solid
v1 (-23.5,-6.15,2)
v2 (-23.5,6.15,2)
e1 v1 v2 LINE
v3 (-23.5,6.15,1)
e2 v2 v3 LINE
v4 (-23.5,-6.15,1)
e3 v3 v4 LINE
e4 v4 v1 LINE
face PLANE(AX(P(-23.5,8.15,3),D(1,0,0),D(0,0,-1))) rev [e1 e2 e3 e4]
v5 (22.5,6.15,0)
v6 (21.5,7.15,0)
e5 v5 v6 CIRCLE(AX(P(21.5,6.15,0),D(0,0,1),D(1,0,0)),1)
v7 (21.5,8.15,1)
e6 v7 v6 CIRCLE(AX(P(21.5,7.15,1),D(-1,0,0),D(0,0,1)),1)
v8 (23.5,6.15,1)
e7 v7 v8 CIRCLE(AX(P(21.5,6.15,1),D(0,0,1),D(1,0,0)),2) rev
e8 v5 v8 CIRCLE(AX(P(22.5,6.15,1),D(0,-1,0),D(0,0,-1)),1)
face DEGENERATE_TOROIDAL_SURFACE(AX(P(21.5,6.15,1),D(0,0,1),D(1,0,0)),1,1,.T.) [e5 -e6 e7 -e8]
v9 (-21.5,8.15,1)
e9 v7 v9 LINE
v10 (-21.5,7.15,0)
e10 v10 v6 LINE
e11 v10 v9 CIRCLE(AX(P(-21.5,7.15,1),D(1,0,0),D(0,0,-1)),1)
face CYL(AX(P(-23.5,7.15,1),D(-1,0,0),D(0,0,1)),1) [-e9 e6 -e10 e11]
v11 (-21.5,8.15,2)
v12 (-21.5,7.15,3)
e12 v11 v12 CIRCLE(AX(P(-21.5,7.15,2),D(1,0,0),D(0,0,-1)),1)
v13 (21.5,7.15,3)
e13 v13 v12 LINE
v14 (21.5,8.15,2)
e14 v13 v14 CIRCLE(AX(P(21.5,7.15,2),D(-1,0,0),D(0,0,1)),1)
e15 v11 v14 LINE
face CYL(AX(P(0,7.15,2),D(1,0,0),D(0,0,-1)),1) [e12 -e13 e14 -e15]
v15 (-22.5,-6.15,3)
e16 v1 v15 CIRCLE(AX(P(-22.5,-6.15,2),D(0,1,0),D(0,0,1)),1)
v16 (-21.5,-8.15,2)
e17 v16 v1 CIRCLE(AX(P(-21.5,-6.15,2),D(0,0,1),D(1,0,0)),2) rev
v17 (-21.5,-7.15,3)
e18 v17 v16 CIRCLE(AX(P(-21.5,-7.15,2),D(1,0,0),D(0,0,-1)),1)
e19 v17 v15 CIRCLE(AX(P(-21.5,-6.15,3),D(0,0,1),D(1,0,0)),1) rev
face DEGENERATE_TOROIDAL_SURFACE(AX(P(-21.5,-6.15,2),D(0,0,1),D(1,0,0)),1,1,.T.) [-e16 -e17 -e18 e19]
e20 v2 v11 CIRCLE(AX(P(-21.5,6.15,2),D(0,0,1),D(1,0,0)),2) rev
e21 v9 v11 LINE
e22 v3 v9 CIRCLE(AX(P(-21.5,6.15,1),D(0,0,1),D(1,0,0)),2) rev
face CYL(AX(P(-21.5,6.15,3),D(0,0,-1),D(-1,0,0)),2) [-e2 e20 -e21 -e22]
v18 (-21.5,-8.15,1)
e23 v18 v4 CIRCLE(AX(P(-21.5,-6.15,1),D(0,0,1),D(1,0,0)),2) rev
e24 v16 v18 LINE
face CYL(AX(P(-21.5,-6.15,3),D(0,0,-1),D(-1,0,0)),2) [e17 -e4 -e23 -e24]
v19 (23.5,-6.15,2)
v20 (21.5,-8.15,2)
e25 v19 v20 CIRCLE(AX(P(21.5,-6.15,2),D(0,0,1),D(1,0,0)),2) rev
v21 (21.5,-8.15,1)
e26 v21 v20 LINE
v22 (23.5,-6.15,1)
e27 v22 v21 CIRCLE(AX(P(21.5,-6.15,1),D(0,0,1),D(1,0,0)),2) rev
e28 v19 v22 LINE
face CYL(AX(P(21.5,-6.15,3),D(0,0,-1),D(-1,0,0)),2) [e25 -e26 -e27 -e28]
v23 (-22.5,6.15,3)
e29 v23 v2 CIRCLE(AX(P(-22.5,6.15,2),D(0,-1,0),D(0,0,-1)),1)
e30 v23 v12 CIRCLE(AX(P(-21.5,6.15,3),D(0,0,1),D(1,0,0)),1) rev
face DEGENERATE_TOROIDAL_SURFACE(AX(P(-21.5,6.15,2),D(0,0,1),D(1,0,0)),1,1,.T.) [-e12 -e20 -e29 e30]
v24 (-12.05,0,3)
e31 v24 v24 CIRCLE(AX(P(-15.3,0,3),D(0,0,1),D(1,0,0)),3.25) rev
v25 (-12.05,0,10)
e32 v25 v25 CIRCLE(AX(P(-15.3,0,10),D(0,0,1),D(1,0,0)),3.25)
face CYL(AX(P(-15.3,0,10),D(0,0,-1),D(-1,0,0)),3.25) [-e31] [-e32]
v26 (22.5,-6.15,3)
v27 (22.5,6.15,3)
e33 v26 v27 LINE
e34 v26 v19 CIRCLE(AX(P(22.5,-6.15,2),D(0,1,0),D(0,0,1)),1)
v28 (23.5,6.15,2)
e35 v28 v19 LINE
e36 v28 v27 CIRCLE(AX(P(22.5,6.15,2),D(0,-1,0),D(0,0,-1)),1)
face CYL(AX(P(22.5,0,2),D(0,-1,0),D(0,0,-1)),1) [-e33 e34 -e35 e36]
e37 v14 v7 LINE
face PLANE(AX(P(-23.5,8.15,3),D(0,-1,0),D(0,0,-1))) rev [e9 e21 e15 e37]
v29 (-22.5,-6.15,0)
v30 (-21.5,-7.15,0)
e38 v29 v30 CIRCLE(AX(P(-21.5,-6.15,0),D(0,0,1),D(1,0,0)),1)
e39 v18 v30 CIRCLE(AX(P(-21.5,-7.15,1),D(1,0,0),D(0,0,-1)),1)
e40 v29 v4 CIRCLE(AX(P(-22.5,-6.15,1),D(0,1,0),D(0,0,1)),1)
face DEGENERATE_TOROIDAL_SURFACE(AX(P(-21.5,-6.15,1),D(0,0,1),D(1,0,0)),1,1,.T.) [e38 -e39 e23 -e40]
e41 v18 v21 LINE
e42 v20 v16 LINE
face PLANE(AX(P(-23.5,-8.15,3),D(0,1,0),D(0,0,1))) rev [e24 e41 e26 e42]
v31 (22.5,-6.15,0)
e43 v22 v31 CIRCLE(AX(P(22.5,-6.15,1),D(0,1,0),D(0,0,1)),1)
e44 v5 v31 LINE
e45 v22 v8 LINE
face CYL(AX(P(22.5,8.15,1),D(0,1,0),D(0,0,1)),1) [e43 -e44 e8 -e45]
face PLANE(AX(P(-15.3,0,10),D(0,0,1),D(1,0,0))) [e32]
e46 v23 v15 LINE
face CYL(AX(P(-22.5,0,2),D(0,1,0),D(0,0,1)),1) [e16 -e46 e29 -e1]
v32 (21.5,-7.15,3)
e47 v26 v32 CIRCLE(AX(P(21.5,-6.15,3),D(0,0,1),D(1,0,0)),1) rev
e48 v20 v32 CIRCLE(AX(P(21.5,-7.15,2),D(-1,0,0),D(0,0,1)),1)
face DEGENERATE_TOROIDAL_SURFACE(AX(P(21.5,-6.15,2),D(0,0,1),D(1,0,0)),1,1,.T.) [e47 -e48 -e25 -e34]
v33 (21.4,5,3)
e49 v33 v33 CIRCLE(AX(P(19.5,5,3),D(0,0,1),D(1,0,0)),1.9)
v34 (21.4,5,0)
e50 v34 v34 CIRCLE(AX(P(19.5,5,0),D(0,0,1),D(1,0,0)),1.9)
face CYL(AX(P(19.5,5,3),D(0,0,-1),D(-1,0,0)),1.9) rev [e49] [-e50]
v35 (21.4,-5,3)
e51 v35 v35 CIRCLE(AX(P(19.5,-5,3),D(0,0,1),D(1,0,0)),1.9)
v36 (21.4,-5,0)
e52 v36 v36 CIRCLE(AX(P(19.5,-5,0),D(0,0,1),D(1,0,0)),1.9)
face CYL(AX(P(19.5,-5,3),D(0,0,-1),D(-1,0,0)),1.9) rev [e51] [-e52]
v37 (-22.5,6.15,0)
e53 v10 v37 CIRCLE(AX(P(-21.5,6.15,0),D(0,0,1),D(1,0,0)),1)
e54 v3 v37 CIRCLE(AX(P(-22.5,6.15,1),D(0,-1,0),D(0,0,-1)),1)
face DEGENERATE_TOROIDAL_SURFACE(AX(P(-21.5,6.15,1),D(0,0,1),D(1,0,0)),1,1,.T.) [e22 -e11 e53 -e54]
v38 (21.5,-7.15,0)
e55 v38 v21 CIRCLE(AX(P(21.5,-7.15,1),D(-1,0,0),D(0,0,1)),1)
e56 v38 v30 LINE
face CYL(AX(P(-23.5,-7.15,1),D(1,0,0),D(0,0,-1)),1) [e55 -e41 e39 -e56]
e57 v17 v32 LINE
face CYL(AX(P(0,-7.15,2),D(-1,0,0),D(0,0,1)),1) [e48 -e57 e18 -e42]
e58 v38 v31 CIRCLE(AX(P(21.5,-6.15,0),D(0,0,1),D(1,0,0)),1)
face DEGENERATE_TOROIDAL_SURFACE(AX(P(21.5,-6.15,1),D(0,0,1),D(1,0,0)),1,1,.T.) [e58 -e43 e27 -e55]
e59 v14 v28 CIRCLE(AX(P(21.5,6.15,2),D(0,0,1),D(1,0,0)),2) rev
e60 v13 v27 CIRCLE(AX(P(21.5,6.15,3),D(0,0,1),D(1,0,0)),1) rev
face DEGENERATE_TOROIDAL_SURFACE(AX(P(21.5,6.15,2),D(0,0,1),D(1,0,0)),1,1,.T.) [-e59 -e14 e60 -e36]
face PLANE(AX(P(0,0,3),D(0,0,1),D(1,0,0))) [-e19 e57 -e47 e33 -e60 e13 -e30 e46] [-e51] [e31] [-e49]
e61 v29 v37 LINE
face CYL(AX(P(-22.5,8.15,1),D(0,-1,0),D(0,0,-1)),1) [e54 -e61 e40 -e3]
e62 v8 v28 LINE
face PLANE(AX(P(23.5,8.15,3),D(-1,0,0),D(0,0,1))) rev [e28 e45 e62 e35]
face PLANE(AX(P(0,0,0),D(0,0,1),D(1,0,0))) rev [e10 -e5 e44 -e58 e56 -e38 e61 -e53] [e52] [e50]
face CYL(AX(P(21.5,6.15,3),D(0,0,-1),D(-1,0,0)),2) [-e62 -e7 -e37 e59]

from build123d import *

# Parameters (mm, degrees)
SKETCH1_W           = 47
SKETCH1_H           = 16.3
SKETCH1_R           = 1.9
BOSS_EXTRUDE1_DEPTH = 3
SKETCH2_R           = 3.25
BOSS_EXTRUDE2_DEPTH = 10
FILLET1_R           = 1
FILLET2_R           = 2


with BuildPart() as part:
    # Sketch1 → Boss-Extrude1 (new body)
    with BuildSketch(Plane.XY):
        Rectangle(SKETCH1_W, SKETCH1_H)
        with Locations((19.5, 5)):
            Circle(SKETCH1_R, mode=Mode.SUBTRACT)
        with Locations((19.5, -5)):
            Circle(SKETCH1_R, mode=Mode.SUBTRACT)
    extrude(amount=BOSS_EXTRUDE1_DEPTH)

    # Sketch2 → Boss-Extrude2 (add)
    with BuildSketch(Plane.XY):
        with Locations((-15.3, 0)):
            Circle(SKETCH2_R)
    extrude(amount=BOSS_EXTRUDE2_DEPTH)

    # Fillet1
    fillet1_edges = [part.edges().sort_by_distance(p)[0] for p in [
        (-23.5, 0, 3),
        (0, -8.15, 3),
        (23.5, 0, 3),
        (0, -8.15, 0),
        (-23.5, 0, 0),
        (0, 8.15, 0),
        (23.5, 0, 0),
        (0, 8.15, 3),
    ]]
    fillet(fillet1_edges, radius=FILLET1_R)

    # Fillet2
    # the kernel refuses this fillet: 2 mm, written as the material it takes off along each edge
    with BuildSketch(Plane(origin=(-21.5, -6.15, 0), x_dir=(0, -1, 0), z_dir=(1, 0, 0))) as fillet2_piece_1:
        with BuildLine():
            CenterArc((1, -1), 1, 0, 90)
            Line((2, -1), (2, 0))
            Line((2, 0), (1, 0))
        make_face()
    revolve(axis=Axis((-21.5, -6.15, 0), (0, 0, -1)), revolution_arc=90, mode=Mode.SUBTRACT)
    with BuildSketch(Plane(origin=(-21.5, 6.15, 0), x_dir=(-1, 0, 0), z_dir=(0, -1, 0))) as fillet2_piece_2:
        with BuildLine():
            CenterArc((1, -1), 1, 0, 90)
            Line((2, -1), (2, 0))
            Line((2, 0), (1, 0))
        make_face()
    revolve(axis=Axis((-21.5, 6.15, 0), (0, 0, -1)), revolution_arc=90, mode=Mode.SUBTRACT)
    with BuildSketch(Plane(origin=(21.5, -6.15, 0), x_dir=(1, 0, 0), z_dir=(0, 1, 0))) as fillet2_piece_3:
        with BuildLine():
            CenterArc((1, -1), 1, 0, 90)
            Line((2, -1), (2, 0))
            Line((2, 0), (1, 0))
        make_face()
    revolve(axis=Axis((21.5, -6.15, 0), (0, 0, -1)), revolution_arc=90, mode=Mode.SUBTRACT)
    with BuildSketch(Plane(origin=(21.5, 6.15, 0), x_dir=(0, 1, 0), z_dir=(-1, 0, 0))) as fillet2_piece_4:
        with BuildLine():
            CenterArc((1, -1), 1, 0, 90)
            Line((2, -1), (2, 0))
            Line((2, 0), (1, 0))
        make_face()
    revolve(axis=Axis((21.5, 6.15, 0), (0, 0, -1)), revolution_arc=90, mode=Mode.SUBTRACT)
    with BuildSketch(Plane(origin=(21.5, -6.15, 3), x_dir=(0, -1, 0), z_dir=(-1, 0, 0))) as fillet2_piece_5:
        with BuildLine():
            CenterArc((1, -1), 1, 0, 90)
            Line((2, -1), (2, 0))
            Line((2, 0), (1, 0))
        make_face()
    revolve(axis=Axis((21.5, -6.15, 3), (0, 0, 1)), revolution_arc=90, mode=Mode.SUBTRACT)
    with BuildSketch(Plane(origin=(-21.5, -6.15, 3), x_dir=(-1, 0, 0), z_dir=(0, 1, 0))) as fillet2_piece_6:
        with BuildLine():
            CenterArc((1, -1), 1, 0, 90)
            Line((2, -1), (2, 0))
            Line((2, 0), (1, 0))
        make_face()
    revolve(axis=Axis((-21.5, -6.15, 3), (0, 0, 1)), revolution_arc=90, mode=Mode.SUBTRACT)
    with BuildSketch(Plane(origin=(21.5, 6.15, 3), x_dir=(1, 0, 0), z_dir=(0, -1, 0))) as fillet2_piece_7:
        with BuildLine():
            CenterArc((1, -1), 1, 0, 90)
            Line((2, -1), (2, 0))
            Line((2, 0), (1, 0))
        make_face()
    revolve(axis=Axis((21.5, 6.15, 3), (0, 0, 1)), revolution_arc=90, mode=Mode.SUBTRACT)
    with BuildSketch(Plane(origin=(-21.5, 6.15, 3), x_dir=(0, 1, 0), z_dir=(1, 0, 0))) as fillet2_piece_8:
        with BuildLine():
            CenterArc((1, -1), 1, 0, 90)
            Line((2, -1), (2, 0))
            Line((2, 0), (1, 0))
        make_face()
    revolve(axis=Axis((-21.5, 6.15, 3), (0, 0, 1)), revolution_arc=90, mode=Mode.SUBTRACT)
    with BuildSketch(Plane(origin=(23.5, 8.15, 0), x_dir=(-1, 0, 0), z_dir=(0, 0, 1)), Plane(origin=(23.5, -8.15, 0), x_dir=(0, 1, 0), z_dir=(0, 0, 1))) as fillet2_piece_9:
        with BuildLine():
            CenterArc((FILLET2_R, FILLET2_R), FILLET2_R, 180, 90)
            Line((0, FILLET2_R), (0, 0))
            Line((0, 0), (FILLET2_R, 0))
        make_face()
    extrude(amount=3, mode=Mode.SUBTRACT)
    with BuildSketch(Plane(origin=(-23.5, -8.15, 0), x_dir=(0, 1, 0), z_dir=(0, 0, 1)), Plane(origin=(-23.5, 8.15, 0), x_dir=(1, 0, 0), z_dir=(0, 0, 1))) as fillet2_piece_10:
        with BuildLine():
            CenterArc((FILLET2_R, -FILLET2_R), FILLET2_R, 90, 90)
            Line((0, -FILLET2_R), (0, 0))
            Line((0, 0), (FILLET2_R, 0))
        make_face()
    extrude(amount=3, mode=Mode.SUBTRACT)


solid = part.part
